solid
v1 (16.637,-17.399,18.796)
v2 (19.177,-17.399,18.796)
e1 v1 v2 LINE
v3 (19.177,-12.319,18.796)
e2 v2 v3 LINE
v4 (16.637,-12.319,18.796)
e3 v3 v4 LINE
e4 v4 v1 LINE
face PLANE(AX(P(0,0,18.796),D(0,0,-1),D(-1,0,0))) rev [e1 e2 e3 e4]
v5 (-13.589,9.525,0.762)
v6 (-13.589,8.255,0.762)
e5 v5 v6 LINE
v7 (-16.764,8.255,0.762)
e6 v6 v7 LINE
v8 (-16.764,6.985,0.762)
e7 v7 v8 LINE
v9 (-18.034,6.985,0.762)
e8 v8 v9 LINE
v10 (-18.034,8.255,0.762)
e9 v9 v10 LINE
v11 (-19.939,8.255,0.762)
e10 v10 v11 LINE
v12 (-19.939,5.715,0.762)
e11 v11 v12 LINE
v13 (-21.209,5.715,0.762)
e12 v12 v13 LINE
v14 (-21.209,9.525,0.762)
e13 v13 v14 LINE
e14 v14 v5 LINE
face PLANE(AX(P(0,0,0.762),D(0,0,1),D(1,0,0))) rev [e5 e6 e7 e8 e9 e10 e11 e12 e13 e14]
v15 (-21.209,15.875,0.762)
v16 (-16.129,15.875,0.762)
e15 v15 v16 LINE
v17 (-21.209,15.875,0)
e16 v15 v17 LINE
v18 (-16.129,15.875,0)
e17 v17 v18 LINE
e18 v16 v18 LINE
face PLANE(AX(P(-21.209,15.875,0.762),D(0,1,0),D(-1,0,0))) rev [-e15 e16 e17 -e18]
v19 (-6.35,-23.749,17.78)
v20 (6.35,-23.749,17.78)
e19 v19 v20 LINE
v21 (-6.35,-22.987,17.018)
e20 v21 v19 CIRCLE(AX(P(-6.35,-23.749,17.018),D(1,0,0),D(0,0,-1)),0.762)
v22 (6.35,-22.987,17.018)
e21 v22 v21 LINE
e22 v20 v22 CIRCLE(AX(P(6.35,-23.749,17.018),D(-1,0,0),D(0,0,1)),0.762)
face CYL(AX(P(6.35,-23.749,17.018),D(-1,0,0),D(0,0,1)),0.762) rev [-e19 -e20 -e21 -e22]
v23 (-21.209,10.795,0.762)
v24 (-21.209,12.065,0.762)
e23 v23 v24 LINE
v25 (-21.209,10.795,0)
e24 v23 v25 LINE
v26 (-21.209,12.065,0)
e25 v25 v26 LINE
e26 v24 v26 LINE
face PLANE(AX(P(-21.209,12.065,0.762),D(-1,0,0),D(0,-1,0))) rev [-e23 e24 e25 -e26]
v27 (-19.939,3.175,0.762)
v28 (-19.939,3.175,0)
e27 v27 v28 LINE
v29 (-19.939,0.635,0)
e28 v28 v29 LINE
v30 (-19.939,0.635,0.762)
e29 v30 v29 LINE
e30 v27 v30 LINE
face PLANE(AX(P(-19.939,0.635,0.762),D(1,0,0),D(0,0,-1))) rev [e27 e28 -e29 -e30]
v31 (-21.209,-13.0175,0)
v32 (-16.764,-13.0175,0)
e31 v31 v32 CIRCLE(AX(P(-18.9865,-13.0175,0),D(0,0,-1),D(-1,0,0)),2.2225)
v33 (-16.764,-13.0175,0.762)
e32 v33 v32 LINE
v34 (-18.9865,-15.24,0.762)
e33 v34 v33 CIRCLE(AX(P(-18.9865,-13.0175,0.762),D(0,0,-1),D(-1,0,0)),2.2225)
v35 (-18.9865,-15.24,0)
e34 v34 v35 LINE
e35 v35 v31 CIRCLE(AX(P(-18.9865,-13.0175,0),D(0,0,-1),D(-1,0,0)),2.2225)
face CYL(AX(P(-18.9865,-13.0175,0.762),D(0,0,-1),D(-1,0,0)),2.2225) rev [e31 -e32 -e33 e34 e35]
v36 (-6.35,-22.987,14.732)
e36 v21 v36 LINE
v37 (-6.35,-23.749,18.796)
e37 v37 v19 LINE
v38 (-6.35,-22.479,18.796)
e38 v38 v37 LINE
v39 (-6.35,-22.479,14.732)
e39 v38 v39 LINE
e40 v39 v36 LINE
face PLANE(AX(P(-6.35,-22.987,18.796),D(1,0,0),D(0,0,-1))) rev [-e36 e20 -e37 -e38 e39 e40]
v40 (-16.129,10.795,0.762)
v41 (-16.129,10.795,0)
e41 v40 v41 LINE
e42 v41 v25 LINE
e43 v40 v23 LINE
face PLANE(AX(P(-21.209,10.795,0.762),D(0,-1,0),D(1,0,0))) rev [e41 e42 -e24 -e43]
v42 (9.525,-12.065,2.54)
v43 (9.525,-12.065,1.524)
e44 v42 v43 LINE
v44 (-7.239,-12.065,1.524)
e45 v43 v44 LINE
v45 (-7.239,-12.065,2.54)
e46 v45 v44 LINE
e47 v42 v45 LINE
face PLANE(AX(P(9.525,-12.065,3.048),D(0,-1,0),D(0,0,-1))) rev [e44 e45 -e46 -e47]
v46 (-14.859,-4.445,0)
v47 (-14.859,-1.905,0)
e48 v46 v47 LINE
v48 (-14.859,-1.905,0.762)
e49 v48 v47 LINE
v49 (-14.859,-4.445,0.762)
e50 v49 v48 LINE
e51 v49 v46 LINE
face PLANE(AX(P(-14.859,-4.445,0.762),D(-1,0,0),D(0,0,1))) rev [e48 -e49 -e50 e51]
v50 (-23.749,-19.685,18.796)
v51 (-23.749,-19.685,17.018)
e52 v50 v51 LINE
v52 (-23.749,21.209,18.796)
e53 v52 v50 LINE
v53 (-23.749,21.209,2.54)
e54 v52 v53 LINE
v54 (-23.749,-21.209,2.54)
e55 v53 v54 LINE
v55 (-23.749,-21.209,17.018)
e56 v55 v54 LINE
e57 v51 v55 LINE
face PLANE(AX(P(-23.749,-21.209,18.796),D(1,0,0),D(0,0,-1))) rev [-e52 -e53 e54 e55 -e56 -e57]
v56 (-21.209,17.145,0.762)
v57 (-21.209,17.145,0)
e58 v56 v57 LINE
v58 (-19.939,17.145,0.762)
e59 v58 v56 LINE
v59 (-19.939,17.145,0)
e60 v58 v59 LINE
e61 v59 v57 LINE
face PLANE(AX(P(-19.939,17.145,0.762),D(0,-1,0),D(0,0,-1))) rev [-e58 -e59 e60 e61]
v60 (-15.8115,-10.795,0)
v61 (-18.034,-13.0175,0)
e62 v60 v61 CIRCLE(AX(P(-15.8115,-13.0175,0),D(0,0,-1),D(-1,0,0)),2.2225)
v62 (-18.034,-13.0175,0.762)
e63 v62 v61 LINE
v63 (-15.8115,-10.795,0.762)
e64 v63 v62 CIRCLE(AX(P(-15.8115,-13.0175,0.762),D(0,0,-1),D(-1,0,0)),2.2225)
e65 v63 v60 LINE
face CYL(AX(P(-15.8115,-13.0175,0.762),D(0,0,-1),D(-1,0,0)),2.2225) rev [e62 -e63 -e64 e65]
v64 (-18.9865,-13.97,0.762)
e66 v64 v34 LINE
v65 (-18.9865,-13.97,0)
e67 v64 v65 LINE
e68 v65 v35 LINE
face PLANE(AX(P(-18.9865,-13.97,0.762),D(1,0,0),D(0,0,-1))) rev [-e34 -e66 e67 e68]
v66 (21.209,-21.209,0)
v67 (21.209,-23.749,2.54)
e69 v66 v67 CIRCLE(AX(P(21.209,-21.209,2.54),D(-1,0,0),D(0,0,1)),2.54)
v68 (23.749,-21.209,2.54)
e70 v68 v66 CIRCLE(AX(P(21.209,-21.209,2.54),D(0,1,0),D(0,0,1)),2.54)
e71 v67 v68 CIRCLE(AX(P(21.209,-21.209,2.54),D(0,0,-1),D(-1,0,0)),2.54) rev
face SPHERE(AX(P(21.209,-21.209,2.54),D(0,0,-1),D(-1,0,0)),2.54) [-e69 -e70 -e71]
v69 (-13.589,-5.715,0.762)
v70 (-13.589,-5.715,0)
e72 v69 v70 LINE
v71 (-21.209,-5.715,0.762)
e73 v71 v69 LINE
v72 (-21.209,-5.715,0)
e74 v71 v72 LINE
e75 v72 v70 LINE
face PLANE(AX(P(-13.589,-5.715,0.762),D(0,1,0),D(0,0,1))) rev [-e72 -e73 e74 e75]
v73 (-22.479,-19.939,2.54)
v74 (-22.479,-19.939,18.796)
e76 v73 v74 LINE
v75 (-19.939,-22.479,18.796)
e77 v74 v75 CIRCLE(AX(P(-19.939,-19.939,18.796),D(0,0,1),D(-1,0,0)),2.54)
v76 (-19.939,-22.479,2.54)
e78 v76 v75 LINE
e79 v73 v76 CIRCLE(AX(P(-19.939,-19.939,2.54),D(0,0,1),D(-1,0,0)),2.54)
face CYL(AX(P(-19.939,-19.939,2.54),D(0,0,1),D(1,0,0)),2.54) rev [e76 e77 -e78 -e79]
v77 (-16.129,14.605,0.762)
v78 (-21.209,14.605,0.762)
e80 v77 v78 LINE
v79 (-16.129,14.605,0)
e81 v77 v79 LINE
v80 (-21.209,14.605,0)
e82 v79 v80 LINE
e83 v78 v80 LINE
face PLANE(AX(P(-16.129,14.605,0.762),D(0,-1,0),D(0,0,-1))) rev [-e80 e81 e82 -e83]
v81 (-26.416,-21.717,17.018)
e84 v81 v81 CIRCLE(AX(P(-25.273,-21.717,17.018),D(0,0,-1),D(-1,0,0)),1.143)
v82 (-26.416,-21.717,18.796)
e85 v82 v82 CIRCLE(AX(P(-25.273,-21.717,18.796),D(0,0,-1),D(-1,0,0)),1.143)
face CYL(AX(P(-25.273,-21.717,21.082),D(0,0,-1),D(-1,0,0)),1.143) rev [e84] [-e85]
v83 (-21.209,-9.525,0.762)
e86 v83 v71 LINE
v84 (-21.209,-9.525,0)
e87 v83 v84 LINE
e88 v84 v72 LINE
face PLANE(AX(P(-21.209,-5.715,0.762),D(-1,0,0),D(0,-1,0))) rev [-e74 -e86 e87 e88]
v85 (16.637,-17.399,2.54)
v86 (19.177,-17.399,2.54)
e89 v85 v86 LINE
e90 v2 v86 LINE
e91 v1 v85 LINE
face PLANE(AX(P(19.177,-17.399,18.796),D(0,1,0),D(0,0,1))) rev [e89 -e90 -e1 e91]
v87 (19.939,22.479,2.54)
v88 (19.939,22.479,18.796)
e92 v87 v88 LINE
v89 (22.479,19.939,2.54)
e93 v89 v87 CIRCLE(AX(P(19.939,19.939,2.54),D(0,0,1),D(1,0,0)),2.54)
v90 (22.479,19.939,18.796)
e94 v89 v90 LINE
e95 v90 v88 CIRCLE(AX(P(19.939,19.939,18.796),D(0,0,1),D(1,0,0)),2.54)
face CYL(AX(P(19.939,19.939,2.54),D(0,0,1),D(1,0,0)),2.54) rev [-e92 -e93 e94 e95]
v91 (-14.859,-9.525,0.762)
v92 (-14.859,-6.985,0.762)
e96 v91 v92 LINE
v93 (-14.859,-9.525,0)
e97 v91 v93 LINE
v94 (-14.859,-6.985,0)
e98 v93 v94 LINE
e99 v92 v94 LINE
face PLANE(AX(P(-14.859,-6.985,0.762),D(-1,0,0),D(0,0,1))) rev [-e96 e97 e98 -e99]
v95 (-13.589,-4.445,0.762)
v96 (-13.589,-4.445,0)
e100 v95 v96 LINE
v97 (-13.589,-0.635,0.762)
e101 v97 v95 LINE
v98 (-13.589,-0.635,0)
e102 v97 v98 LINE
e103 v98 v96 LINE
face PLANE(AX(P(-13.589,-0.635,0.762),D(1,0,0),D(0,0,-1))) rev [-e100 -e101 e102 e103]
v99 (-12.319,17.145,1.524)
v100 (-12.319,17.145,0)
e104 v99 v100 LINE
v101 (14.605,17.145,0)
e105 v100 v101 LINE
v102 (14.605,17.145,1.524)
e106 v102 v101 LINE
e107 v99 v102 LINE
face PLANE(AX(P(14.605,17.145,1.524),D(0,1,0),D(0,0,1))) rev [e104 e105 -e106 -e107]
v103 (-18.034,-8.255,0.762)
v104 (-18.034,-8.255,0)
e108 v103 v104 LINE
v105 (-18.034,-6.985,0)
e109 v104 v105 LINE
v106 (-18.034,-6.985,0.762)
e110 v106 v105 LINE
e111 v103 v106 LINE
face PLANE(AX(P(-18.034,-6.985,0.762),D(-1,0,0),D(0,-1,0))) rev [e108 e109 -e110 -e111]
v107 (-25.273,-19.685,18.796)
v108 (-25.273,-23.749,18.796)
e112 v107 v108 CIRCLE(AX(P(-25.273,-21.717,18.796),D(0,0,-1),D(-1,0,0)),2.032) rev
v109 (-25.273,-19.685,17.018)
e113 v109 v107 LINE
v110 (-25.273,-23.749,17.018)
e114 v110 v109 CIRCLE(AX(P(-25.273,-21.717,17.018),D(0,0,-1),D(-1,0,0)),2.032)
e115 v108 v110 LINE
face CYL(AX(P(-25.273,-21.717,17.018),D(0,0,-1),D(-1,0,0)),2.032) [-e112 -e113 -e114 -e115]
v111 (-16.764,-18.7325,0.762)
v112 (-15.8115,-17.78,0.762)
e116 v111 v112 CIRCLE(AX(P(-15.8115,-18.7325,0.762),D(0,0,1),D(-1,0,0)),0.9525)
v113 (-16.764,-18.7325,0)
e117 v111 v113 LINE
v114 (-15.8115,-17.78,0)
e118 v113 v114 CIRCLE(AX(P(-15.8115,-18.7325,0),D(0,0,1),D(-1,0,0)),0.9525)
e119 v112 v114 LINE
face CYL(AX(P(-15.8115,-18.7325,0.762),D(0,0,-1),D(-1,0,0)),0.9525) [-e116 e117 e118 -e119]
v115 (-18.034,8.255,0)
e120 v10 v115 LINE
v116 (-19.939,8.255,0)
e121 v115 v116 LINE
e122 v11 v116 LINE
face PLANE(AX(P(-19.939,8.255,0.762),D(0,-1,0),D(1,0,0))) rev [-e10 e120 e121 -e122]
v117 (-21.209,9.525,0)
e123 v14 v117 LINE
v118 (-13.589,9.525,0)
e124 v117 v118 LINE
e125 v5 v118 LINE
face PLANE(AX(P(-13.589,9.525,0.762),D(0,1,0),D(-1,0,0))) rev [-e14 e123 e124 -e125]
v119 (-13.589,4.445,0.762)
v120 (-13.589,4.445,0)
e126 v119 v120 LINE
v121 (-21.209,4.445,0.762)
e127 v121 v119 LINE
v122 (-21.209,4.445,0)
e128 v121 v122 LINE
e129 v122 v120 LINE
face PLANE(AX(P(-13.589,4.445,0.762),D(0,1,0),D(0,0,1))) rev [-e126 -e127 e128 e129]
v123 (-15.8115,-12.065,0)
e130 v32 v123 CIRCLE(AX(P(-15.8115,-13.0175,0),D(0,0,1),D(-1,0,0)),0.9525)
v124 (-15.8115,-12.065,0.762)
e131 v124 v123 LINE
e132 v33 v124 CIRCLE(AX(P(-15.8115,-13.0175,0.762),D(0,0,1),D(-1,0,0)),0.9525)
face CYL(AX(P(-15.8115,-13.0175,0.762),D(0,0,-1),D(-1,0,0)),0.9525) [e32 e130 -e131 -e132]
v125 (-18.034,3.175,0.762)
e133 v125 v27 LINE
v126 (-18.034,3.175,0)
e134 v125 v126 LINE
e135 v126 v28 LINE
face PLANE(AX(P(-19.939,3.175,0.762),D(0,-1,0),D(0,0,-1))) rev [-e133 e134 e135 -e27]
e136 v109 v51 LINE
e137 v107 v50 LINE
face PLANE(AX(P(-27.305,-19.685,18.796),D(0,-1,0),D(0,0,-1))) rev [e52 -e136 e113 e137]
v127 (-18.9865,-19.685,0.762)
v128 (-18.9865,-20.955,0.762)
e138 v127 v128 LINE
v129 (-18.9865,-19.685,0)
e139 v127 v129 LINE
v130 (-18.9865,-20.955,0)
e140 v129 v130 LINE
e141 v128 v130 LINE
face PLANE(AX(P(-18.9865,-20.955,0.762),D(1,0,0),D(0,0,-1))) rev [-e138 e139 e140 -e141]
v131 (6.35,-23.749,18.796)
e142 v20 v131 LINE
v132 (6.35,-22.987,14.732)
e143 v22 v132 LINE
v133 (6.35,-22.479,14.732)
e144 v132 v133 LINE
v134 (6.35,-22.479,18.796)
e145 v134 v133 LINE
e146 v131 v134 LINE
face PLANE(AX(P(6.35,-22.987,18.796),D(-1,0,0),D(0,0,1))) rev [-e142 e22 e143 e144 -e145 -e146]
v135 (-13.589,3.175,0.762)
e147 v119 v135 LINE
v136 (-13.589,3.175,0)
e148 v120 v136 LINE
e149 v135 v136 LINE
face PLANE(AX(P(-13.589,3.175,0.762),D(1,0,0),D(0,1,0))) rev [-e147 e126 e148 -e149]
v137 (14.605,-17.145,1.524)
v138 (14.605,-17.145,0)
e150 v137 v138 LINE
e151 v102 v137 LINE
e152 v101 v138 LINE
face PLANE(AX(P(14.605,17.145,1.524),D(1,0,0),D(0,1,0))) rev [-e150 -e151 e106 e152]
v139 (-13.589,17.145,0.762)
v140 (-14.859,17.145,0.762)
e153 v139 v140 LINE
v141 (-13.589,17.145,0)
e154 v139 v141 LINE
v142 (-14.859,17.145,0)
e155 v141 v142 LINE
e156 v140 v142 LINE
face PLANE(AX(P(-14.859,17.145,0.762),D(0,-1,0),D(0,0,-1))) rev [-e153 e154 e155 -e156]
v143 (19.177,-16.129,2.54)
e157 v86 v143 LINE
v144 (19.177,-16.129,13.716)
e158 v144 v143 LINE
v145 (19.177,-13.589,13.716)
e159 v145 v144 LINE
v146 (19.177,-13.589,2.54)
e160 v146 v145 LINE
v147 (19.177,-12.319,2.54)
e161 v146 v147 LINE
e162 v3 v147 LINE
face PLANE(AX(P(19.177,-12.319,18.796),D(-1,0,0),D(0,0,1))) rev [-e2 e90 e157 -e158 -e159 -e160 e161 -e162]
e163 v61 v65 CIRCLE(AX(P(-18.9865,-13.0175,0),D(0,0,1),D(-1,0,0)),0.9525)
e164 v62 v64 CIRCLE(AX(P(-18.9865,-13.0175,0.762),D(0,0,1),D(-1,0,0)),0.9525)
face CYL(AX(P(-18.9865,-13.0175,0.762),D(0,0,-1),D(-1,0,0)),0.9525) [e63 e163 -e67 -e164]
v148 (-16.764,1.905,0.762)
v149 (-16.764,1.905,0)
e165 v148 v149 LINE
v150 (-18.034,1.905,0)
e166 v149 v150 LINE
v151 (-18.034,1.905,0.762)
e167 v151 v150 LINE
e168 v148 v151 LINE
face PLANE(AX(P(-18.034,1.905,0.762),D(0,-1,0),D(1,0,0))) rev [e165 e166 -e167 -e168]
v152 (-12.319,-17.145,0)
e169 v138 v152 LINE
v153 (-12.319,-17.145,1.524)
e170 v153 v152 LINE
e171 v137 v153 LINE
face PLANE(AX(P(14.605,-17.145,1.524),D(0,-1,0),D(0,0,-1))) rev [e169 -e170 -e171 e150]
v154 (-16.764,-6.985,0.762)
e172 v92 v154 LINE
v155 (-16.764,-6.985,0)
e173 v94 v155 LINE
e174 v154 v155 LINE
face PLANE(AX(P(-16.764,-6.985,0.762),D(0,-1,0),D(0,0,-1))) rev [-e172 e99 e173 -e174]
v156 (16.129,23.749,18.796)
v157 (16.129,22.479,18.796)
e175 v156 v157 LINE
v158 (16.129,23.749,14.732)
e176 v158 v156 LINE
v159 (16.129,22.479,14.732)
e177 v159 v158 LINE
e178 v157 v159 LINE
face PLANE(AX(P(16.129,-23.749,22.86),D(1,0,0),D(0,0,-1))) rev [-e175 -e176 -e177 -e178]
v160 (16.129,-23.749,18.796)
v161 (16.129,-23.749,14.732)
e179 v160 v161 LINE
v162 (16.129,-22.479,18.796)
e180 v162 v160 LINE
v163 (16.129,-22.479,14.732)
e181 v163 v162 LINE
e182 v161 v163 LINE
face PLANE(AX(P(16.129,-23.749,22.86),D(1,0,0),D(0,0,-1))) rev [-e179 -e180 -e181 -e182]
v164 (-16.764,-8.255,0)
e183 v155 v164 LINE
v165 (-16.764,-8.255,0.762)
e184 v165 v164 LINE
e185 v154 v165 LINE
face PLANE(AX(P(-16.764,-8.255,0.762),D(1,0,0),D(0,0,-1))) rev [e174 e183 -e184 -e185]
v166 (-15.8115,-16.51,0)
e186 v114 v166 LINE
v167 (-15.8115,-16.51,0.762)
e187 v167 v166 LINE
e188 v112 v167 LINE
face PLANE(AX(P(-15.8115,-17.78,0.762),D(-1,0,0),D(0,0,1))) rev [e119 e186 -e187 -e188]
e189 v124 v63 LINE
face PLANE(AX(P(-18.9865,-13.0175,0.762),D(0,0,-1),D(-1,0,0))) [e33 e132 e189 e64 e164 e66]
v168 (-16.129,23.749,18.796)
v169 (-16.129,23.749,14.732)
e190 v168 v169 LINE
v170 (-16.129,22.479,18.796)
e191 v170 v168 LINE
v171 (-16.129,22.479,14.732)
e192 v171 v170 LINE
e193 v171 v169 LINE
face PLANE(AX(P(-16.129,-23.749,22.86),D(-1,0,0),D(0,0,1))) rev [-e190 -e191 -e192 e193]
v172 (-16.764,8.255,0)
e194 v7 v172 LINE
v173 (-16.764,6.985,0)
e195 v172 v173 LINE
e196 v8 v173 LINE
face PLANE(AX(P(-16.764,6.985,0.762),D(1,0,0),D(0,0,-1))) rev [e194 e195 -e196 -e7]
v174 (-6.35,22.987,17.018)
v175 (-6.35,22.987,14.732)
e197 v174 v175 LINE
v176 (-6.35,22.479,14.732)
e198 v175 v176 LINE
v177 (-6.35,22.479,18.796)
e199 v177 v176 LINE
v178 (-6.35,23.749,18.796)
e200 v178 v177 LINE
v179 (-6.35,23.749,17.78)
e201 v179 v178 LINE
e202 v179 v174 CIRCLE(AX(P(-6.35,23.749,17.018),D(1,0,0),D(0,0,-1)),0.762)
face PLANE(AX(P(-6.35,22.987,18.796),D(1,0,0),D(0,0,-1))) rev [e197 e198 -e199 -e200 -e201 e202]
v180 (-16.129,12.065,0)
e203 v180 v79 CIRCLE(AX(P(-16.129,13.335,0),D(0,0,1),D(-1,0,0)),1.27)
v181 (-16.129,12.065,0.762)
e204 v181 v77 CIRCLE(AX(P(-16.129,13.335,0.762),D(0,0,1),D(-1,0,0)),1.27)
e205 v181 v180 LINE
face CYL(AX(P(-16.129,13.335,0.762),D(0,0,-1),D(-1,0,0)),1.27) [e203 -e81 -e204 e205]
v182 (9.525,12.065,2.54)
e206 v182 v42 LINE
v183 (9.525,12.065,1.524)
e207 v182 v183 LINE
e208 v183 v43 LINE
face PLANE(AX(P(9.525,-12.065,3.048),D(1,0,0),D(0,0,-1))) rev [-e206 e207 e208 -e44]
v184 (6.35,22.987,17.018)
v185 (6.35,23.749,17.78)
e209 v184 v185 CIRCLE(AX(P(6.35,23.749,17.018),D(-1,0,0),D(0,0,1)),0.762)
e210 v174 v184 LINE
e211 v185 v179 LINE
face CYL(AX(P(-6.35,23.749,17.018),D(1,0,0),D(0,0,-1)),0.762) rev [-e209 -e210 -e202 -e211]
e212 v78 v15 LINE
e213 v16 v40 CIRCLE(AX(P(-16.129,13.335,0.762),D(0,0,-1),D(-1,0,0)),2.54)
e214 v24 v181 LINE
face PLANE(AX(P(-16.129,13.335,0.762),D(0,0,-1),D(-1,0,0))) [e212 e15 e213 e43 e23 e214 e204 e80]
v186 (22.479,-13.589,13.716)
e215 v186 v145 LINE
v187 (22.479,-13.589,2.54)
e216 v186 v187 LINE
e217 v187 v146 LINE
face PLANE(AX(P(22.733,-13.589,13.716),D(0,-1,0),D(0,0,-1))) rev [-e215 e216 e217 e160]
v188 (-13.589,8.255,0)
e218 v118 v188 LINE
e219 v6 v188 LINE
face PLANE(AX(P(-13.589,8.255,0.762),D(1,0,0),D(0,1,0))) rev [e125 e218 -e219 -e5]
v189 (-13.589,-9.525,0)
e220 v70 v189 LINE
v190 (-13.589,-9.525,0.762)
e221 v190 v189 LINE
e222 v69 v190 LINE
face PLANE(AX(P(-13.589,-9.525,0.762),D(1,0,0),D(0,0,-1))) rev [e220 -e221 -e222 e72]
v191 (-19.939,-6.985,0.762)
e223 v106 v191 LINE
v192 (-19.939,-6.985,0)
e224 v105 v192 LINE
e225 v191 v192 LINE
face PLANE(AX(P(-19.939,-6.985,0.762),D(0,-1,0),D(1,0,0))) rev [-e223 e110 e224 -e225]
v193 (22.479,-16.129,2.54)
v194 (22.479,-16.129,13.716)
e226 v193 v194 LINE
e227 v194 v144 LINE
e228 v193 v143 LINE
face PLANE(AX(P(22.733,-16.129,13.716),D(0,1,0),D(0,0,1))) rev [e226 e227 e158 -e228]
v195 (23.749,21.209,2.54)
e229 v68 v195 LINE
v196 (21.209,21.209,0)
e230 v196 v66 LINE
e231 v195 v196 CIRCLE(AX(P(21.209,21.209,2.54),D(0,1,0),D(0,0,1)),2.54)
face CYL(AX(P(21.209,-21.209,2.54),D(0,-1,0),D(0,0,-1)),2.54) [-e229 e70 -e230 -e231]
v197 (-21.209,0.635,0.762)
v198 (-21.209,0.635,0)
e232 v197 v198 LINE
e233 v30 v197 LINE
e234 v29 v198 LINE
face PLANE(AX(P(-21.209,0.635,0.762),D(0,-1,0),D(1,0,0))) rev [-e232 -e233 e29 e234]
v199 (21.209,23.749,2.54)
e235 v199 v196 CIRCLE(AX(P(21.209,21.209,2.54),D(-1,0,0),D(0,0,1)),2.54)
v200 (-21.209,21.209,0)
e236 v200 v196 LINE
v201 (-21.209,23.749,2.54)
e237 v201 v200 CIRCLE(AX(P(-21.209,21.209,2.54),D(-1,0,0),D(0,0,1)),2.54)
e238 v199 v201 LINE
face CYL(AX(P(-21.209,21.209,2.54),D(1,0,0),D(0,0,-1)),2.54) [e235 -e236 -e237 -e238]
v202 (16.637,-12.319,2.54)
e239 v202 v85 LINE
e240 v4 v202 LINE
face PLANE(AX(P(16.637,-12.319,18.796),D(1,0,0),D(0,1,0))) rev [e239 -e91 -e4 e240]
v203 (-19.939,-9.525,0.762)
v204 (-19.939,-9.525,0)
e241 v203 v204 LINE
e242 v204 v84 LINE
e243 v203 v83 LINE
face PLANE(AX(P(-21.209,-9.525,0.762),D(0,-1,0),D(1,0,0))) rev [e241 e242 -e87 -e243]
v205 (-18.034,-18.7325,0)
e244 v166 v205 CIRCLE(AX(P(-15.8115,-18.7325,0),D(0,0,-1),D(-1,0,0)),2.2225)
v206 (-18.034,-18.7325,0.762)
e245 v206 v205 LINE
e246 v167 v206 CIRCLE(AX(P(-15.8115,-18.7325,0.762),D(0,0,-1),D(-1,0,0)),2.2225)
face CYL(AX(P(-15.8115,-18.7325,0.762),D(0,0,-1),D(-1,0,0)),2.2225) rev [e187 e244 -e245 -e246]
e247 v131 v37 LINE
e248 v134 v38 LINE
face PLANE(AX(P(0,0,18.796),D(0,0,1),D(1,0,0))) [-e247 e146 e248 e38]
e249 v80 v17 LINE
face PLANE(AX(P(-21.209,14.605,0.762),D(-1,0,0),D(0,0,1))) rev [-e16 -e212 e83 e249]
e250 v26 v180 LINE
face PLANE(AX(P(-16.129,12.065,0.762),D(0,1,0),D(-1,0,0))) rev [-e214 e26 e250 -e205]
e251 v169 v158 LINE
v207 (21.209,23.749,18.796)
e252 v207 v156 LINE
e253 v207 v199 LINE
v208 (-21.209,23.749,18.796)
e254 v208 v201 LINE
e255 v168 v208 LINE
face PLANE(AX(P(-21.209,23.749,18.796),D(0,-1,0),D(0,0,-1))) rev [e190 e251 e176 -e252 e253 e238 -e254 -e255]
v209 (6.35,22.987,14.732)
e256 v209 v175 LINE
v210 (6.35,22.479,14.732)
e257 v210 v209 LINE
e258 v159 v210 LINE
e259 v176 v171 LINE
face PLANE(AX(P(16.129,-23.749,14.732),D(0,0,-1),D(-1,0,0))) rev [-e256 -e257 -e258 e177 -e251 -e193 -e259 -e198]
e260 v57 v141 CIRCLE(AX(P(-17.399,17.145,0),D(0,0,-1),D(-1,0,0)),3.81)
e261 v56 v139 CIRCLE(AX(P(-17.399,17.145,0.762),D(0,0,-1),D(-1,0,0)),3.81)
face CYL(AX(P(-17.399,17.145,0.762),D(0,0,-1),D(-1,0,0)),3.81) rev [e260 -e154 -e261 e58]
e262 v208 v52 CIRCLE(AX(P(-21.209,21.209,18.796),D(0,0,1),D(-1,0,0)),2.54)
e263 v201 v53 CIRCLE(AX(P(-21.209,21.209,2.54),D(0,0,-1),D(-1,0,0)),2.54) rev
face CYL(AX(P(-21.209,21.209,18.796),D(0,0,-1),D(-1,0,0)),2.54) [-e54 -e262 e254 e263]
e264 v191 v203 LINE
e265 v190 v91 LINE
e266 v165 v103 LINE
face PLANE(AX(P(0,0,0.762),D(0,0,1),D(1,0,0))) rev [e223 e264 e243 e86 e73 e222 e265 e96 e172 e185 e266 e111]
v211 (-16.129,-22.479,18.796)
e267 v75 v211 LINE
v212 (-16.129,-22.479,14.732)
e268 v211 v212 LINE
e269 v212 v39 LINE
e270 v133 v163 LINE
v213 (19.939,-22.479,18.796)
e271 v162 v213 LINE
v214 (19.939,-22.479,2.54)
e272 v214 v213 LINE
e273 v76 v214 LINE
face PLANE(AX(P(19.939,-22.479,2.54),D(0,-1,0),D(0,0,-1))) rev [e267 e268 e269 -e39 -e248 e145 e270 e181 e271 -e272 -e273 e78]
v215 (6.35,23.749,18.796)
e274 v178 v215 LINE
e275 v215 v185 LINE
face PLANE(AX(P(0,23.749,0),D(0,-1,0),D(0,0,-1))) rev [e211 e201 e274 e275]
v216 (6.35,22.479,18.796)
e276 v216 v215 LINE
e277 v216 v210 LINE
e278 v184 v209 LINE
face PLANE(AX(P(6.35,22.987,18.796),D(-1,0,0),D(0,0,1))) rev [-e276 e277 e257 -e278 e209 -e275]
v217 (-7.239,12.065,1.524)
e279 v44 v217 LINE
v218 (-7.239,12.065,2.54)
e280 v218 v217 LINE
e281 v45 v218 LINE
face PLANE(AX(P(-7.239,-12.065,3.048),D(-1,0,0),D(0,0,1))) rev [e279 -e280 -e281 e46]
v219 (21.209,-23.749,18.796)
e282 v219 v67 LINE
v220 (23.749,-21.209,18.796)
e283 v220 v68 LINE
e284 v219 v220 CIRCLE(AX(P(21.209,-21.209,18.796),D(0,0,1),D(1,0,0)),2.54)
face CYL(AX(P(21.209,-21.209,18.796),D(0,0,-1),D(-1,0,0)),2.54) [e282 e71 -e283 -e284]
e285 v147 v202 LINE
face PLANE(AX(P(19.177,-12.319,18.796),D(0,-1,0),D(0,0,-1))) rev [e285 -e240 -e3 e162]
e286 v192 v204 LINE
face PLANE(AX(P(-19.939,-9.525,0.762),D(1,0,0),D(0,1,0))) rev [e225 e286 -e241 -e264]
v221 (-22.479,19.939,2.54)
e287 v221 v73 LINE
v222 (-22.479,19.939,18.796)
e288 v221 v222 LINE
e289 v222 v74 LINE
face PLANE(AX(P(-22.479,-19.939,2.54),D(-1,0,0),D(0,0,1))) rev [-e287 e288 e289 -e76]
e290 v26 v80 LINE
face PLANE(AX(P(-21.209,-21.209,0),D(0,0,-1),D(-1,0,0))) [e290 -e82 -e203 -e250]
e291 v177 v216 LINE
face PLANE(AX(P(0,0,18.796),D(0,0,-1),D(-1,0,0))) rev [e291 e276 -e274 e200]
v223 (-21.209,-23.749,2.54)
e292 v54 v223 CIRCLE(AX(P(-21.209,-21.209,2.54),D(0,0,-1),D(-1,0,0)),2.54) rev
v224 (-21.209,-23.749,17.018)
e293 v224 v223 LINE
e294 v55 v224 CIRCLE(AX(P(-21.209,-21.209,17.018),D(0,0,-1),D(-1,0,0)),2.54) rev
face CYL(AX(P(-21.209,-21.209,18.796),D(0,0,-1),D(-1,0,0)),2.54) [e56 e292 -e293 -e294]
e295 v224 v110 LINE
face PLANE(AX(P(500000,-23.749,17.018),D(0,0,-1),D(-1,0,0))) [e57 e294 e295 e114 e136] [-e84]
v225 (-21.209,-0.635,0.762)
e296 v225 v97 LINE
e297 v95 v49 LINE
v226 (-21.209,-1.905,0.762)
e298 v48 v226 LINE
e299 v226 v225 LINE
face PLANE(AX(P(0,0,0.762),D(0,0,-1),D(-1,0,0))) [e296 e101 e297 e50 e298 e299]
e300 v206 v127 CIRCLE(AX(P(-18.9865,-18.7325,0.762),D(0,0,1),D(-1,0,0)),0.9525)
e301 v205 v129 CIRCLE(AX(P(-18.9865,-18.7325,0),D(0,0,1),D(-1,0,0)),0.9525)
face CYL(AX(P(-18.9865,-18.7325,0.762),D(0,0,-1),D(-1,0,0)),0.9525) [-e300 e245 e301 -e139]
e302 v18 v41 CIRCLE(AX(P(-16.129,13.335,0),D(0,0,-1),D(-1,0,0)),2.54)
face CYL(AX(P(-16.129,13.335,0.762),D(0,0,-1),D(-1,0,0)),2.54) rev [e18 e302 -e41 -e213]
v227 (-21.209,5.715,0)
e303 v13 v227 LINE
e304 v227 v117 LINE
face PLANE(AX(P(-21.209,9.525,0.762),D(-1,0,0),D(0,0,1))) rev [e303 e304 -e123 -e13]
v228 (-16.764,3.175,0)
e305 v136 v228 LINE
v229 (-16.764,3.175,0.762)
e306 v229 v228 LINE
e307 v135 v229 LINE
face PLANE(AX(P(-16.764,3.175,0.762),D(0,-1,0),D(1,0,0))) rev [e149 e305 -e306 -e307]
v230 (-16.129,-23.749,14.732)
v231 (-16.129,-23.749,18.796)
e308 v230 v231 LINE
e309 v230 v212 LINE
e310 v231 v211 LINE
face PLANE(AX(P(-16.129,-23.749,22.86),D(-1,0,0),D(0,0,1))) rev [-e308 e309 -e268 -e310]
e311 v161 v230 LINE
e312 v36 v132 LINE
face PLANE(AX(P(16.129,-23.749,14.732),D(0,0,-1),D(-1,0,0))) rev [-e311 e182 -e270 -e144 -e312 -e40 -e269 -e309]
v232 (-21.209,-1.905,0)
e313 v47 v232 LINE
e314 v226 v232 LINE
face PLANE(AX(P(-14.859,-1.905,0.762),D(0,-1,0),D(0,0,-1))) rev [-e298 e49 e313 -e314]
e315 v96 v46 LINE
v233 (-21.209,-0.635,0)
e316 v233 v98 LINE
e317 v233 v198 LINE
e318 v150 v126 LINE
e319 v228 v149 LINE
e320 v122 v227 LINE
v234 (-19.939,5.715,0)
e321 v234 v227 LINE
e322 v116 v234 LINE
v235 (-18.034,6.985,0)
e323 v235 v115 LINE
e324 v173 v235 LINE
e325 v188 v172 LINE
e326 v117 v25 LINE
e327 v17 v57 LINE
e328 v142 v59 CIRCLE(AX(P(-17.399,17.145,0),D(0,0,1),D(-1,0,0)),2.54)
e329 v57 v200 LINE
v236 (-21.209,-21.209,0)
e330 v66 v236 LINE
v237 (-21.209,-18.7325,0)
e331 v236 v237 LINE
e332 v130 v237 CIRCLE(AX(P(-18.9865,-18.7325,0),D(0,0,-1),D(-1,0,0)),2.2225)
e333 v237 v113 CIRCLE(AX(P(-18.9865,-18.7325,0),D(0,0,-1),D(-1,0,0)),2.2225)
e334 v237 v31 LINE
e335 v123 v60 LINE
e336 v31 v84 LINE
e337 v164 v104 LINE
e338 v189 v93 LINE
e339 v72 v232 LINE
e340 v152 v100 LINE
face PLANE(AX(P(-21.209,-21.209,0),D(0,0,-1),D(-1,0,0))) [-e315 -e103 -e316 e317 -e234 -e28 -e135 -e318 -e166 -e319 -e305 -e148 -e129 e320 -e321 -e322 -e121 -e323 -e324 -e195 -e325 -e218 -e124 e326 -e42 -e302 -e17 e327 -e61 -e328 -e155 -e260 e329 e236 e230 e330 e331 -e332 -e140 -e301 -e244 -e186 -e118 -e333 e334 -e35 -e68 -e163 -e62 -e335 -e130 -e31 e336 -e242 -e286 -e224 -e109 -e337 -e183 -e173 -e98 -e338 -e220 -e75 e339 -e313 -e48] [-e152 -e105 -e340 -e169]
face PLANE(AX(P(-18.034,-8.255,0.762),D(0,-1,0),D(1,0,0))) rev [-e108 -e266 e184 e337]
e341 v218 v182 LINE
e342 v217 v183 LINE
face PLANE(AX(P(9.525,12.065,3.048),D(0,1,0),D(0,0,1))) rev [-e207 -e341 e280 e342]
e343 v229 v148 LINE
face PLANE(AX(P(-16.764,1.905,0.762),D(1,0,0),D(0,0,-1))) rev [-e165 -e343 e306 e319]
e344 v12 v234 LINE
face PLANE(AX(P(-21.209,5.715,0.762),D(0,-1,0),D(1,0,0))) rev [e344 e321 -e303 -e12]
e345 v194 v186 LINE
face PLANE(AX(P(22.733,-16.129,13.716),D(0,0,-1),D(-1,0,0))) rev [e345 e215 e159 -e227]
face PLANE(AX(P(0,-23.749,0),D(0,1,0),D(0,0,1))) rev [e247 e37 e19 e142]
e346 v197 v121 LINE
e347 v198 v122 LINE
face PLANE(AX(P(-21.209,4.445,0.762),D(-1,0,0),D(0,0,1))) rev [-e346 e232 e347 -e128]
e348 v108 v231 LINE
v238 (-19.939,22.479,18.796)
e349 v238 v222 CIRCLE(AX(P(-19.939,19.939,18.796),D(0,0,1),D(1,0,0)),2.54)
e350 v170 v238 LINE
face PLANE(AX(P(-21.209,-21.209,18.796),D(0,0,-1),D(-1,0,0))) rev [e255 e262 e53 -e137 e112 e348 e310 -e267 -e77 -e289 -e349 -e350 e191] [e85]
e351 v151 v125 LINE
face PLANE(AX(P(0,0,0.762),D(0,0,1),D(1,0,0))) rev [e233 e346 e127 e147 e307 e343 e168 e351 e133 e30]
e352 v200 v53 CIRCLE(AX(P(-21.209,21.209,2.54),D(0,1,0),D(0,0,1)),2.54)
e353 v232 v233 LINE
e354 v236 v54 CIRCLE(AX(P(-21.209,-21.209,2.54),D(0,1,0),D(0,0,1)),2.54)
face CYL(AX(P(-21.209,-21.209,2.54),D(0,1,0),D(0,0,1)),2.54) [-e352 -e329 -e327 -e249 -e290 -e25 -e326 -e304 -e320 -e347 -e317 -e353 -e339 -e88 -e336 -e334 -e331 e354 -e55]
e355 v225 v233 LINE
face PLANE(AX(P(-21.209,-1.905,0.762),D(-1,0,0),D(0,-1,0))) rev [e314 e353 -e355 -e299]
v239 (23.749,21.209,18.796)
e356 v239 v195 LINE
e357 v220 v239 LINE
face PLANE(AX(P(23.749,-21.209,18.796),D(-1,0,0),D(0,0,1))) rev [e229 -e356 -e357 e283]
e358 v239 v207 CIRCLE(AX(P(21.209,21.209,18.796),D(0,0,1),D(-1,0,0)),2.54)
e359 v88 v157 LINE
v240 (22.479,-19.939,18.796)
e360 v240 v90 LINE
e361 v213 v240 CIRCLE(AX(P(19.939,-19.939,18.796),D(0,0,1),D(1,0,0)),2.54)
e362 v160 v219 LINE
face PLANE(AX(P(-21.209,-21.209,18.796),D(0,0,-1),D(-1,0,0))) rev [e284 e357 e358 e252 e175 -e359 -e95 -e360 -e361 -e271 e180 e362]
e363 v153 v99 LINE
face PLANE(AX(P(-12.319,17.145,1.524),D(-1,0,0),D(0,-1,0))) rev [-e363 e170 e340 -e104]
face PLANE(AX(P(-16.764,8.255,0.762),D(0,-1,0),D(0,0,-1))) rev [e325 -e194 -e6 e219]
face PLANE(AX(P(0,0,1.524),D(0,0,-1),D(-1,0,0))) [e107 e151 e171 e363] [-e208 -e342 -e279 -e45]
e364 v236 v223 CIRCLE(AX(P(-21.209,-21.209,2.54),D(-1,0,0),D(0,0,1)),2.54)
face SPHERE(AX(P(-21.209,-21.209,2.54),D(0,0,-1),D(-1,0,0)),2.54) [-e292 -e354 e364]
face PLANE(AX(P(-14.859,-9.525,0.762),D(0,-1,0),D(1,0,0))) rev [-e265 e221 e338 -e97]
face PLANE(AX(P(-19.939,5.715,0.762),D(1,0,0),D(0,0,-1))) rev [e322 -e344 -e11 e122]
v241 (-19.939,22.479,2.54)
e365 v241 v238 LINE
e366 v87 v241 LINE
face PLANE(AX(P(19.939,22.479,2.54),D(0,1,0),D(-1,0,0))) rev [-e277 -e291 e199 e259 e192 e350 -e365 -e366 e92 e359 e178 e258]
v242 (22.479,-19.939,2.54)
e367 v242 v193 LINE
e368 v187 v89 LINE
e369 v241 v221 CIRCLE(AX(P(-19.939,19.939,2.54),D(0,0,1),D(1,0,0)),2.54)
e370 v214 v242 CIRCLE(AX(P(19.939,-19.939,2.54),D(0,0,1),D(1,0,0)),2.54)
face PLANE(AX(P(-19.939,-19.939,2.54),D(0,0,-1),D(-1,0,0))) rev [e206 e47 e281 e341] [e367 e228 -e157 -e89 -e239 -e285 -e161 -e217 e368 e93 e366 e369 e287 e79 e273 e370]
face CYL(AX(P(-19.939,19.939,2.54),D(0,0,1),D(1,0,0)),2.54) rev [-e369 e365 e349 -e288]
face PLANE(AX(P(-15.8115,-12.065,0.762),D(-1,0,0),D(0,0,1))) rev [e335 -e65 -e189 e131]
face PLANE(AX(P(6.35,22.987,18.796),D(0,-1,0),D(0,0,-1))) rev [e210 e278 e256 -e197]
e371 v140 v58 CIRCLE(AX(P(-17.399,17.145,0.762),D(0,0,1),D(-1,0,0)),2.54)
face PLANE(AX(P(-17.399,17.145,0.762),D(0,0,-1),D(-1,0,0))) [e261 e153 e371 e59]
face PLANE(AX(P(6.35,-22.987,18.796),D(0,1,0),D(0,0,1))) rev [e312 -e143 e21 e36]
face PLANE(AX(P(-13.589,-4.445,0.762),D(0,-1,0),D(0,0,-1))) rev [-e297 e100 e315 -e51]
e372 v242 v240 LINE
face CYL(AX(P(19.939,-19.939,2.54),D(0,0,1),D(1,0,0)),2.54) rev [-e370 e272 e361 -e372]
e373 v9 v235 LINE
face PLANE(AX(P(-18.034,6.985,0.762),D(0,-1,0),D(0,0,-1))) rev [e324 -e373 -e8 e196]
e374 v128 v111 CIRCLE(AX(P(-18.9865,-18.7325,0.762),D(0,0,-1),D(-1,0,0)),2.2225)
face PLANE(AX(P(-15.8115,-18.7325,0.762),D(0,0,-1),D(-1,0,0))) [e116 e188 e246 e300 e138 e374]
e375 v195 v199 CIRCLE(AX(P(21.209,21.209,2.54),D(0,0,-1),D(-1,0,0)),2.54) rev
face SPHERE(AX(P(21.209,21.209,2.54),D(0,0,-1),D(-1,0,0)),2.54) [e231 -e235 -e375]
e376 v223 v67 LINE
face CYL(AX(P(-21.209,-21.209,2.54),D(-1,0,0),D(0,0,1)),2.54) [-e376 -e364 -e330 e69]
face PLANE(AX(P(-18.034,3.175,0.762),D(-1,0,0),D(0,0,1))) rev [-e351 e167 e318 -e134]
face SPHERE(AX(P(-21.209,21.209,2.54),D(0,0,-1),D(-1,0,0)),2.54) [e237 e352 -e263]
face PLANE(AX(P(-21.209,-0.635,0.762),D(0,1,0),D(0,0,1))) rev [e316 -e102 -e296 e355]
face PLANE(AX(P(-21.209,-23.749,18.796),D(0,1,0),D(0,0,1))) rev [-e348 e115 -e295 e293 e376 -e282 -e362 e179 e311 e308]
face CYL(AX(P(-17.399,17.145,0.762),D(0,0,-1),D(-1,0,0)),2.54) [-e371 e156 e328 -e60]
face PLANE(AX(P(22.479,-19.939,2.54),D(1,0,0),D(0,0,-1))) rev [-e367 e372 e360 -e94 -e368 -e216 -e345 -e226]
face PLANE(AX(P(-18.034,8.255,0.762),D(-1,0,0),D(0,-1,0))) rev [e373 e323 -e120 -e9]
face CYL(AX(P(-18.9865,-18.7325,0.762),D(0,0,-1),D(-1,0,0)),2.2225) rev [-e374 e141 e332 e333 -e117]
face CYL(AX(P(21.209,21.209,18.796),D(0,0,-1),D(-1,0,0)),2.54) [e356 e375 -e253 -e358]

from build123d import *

# Parameters (mm, degrees)
BOSS_EXTRUDE1_DEPTH             = 18.796
CUT_EXTRUDE1_DEPTH              = 16.256
FILLET1_R                       = 2.54
CUT_EXTRUDE2_DEPTH              = 57.332624837
CUT_EXTRUDE2_DEPTH_BACK         = 57.332624837
SKETCH3_W                       = 32.258
SKETCH3_H                       = 8.128
SKETCH5_W                       = 26.924
SKETCH5_H                       = 34.29
CUT_EXTRUDE4_DEPTH              = 1.524
SKETCH6_W                       = 16.764
SKETCH6_H                       = 24.13
CUT_EXTRUDE5_DEPTH              = 1.524
SKETCH8_W                       = 12.7
SKETCH8_H                       = 0.508
BOSS_EXTRUDE3_DEPTH             = 4.064
SKETCH9_W                       = 12.7
SKETCH9_H                       = 1.016
BOSS_EXTRUDE4_DEPTH             = 0.762
FILLET2_R                       = 0.762
SKETCH10_W                      = 12.7
SKETCH10_H                      = 1.016
BOSS_EXTRUDE5_DEPTH             = 0.762
FILLET3_R                       = 0.762
SKETCH11_W                      = 1.778
SKETCH11_H                      = 4.064
BOSS_EXTRUDE6_DEPTH             = 3.556
BOSS_EXTRUDE6_DIRECTION_2_REACH = 58.333
FILLET4_RADIUS                  = 2.032
FILLET4_LENGTH                  = 1.778
SKETCH12_R                      = 1.143
CUT_EXTRUDE7_DEPTH              = 4.064
CUT_EXTRUDE8_DEPTH              = 0.762
SKETCH13_W                      = 2.54
SKETCH13_H                      = 5.08
BOSS_EXTRUDE7_DEPTH             = 16.256
SKETCH15_W                      = 11.176
SKETCH15_H                      = 2.54
BOSS_EXTRUDE8_DEPTH             = 3.556


with BuildPart() as part:
    # Sketch1 → Boss-Extrude1 (new body)
    with BuildSketch(Plane.XY):
        with BuildLine():
            Line((-21.209, -23.749), (21.209, -23.749))
            ThreePointArc((21.209, -23.749), (23.005051224, -23.005051224), (23.749, -21.209))
            Line((23.749, -21.209), (23.749, 21.209))
            ThreePointArc((23.749, 21.209), (23.005051224, 23.005051224), (21.209, 23.749))
            Line((21.209, 23.749), (-21.209, 23.749))
            ThreePointArc((-21.209, 23.749), (-23.005051224, 23.005051224), (-23.749, 21.209))
            Line((-23.749, 21.209), (-23.749, -21.209))
            ThreePointArc((-23.749, -21.209), (-23.005051224, -23.005051224), (-21.209, -23.749))
        make_face()
    extrude(amount=BOSS_EXTRUDE1_DEPTH)

    # Sketch2 → Cut-Extrude1 (cut)
    with BuildSketch(Plane.XY.offset(18.796)):
        with BuildLine():
            Line((19.939, -22.479), (-19.939, -22.479))
            ThreePointArc((-19.939, -22.479), (-21.735051224, -21.735051224), (-22.479, -19.939))
            Line((-22.479, -19.939), (-22.479, 19.939))
            ThreePointArc((-22.479, 19.939), (-21.735051224, 21.735051224), (-19.939, 22.479))
            Line((-19.939, 22.479), (19.939, 22.479))
            ThreePointArc((19.939, 22.479), (21.735051224, 21.735051224), (22.479, 19.939))
            Line((22.479, 19.939), (22.479, -19.939))
            ThreePointArc((22.479, -19.939), (21.735051224, -21.735051224), (19.939, -22.479))
        make_face()
    extrude(amount=-CUT_EXTRUDE1_DEPTH, mode=Mode.SUBTRACT)

    # Fillet1
    fillet1_edges = [part.edges().sort_by_distance(p)[0] for p in [
        (0, -23.749, 0),
        (-23.005051224, -23.005051224, 0),
        (-23.749, 0, 0),
        (-23.005051224, 23.005051224, 0),
        (0, 23.749, 0),
        (23.005051224, 23.005051224, 0),
        (23.749, 0, 0),
        (23.005051224, -23.005051224, 0),
    ]]
    fillet(fillet1_edges, radius=FILLET1_R)

    # Sketch3 → Cut-Extrude2 (cut, two sides: drawn at the far end of the back side and taken through both)
    with BuildSketch(Plane(origin=(0, 23.749, 0), x_dir=(1, 0, 0), z_dir=(0, 1, 0)).offset(-CUT_EXTRUDE2_DEPTH_BACK)):
        with Locations((0, -18.796)):
            Rectangle(SKETCH3_W, SKETCH3_H)
    extrude(amount=CUT_EXTRUDE2_DEPTH + CUT_EXTRUDE2_DEPTH_BACK, mode=Mode.SUBTRACT)

    # Sketch5 → Cut-Extrude4 (cut)
    with BuildSketch(Plane(origin=(0, 0, 0), x_dir=(-1, 0, 0), z_dir=(0, 0, -1))):
        with Locations((-1.143, 0)):
            Rectangle(SKETCH5_W, SKETCH5_H)
    extrude(amount=-CUT_EXTRUDE4_DEPTH, mode=Mode.SUBTRACT)

    # Sketch6 → Cut-Extrude5 (cut)
    with BuildSketch(Plane(origin=(0, 0, 1.524), x_dir=(-1, 0, 0), z_dir=(0, 0, -1))):
        with Locations((-1.143, 0)):
            Rectangle(SKETCH6_W, SKETCH6_H)
    extrude(amount=-CUT_EXTRUDE5_DEPTH, mode=Mode.SUBTRACT)

    # Sketch8 → Boss-Extrude3 (add)
    with BuildSketch(Plane.XY.offset(14.732)):
        with Locations((0, 22.733)):
            Rectangle(SKETCH8_W, SKETCH8_H)
        with Locations((0, -22.733)):
            Rectangle(SKETCH8_W, SKETCH8_H)
    extrude(amount=BOSS_EXTRUDE3_DEPTH)

    # Sketch9 → Boss-Extrude4 (add)
    with BuildSketch(Plane(origin=(0, 22.987, 0), x_dir=(1, 0, 0), z_dir=(0, 1, 0))):
        with Locations((0, -18.288)):
            Rectangle(SKETCH9_W, SKETCH9_H)
    extrude(amount=BOSS_EXTRUDE4_DEPTH)

    # Fillet2
    fillet2_edges = [part.edges().sort_by_distance(p)[0] for p in [
        (0, 22.987, 17.78),
    ]]
    fillet(fillet2_edges, radius=FILLET2_R - 0.0001)  # a hair under: the kernel refuses the full size

    # Sketch10 → Boss-Extrude5 (add)
    with BuildSketch(Plane.XZ.offset(22.987)):
        with Locations((0, 18.288)):
            Rectangle(SKETCH10_W, SKETCH10_H)
    extrude(amount=BOSS_EXTRUDE5_DEPTH)

    # Fillet3
    fillet3_edges = [part.edges().sort_by_distance(p)[0] for p in [
        (0, -22.987, 17.78),
    ]]
    fillet(fillet3_edges, radius=FILLET3_R - 0.0001)  # a hair under: the kernel refuses the full size

    # Sketch11 → Boss-Extrude6 (add)
    with BuildSketch(Plane.ZY.offset(23.749)):
        with Locations((17.907, -21.717)):
            Rectangle(SKETCH11_W, SKETCH11_H)
    extrude(amount=BOSS_EXTRUDE6_DEPTH)

    # Sketch11 → Boss-Extrude6 direction 2 (add, up to next)
    with BuildSketch(Plane.ZY.offset(23.749), mode=Mode.PRIVATE) as boss_extrude6_direction_2_sk1:
        with Locations((17.907, -21.717)):
            Rectangle(SKETCH11_W, SKETCH11_H)
    boss_extrude6_direction_2_tool1 = extrude(boss_extrude6_direction_2_sk1.sketch, amount=-BOSS_EXTRUDE6_DIRECTION_2_REACH, mode=Mode.PRIVATE) - part.part
    add(boss_extrude6_direction_2_tool1.solids().sort_by_distance((-23.749, -21.717, 17.907))[0])

    # Fillet4: full round fillet: the end face becomes a half cylinder, R = half its width
    fillet4_face = Plane((-27.305, -21.717, 17.907), x_dir=(0, 0, -1), z_dir=(-1, 0, 0))  # on the end face: x along it, z out of the body
    fillet4_slab = fillet4_face.offset(-FILLET4_RADIUS / 2) * Box(FILLET4_LENGTH, 2 * FILLET4_RADIUS, FILLET4_RADIUS, mode=Mode.PRIVATE)  # the body's end, R deep
    fillet4_round = Plane((-25.273, -21.717, 17.907), x_dir=(-1, 0, 0), z_dir=(0, 0, -1)) * Cylinder(FILLET4_RADIUS, FILLET4_LENGTH, mode=Mode.PRIVATE)  # its axis R under the face
    add(fillet4_slab - fillet4_round, mode=Mode.SUBTRACT)

    # Sketch12 → Cut-Extrude7 (cut)
    with BuildSketch(Plane(origin=(0, 0, 17.018), x_dir=(-1, 0, 0), z_dir=(0, 0, -1))):
        with Locations((25.273, -21.717)):
            Circle(SKETCH12_R)
    extrude(amount=-CUT_EXTRUDE7_DEPTH, mode=Mode.SUBTRACT)

    # Sketch7 → Cut-Extrude8 (cut)
    with BuildSketch(Plane(origin=(0, 0, 0), x_dir=(-1, 0, 0), z_dir=(0, 0, -1))):
        with BuildLine():
            Line((19.939, 17.145), (21.209, 17.145))
            ThreePointArc((21.209, 17.145), (17.399, 20.955), (13.589, 17.145))
            Line((13.589, 17.145), (14.859, 17.145))
            ThreePointArc((14.859, 17.145), (17.399, 19.685), (19.939, 17.145))
        make_face()
        with BuildLine():
            Line((21.209, 15.875), (16.129, 15.875))
            ThreePointArc((16.129, 15.875), (13.589, 13.335), (16.129, 10.795))
            Line((16.129, 10.795), (21.209, 10.795))
            Line((21.209, 10.795), (21.209, 12.065))
            Line((21.209, 12.065), (16.129, 12.065))
            ThreePointArc((16.129, 12.065), (14.859, 13.335), (16.129, 14.605))
            Line((16.129, 14.605), (21.209, 14.605))
            Line((21.209, 14.605), (21.209, 15.875))
        make_face()
        Polygon((13.589, 9.525), (21.209, 9.525), (21.209, 5.715), (19.939, 5.715), (19.939, 8.255), (18.034, 8.255), (18.034, 6.985), (16.764, 6.985), (16.764, 8.255), (13.589, 8.255), align=None)
        Polygon((13.589, 4.445), (21.209, 4.445), (21.209, 0.635), (19.939, 0.635), (19.939, 3.175), (18.034, 3.175), (18.034, 1.905), (16.764, 1.905), (16.764, 3.175), (13.589, 3.175), align=None)
        Polygon((21.209, -0.635), (13.589, -0.635), (13.589, -4.445), (14.859, -4.445), (14.859, -1.905), (21.209, -1.905), align=None)
        Polygon((13.589, -5.715), (21.209, -5.715), (21.209, -9.525), (19.939, -9.525), (19.939, -6.985), (18.034, -6.985), (18.034, -8.255), (16.764, -8.255), (16.764, -6.985), (14.859, -6.985), (14.859, -9.525), (13.589, -9.525), align=None)
        with BuildLine():
            Line((18.9865, -13.97), (18.9865, -15.24))
            ThreePointArc((18.9865, -15.24), (20.558044821, -11.445955179), (16.764, -13.0175))
            ThreePointArc((16.764, -13.0175), (15.137980791, -13.691019209), (15.8115, -12.065))
            Line((15.8115, -12.065), (15.8115, -10.795))
            ThreePointArc((15.8115, -10.795), (14.239955179, -14.589044821), (18.034, -13.0175))
            ThreePointArc((18.034, -13.0175), (19.660019209, -12.343980791), (18.9865, -13.97))
        make_face()
        with BuildLine():
            Line((15.8115, -17.78), (15.8115, -16.51))
            ThreePointArc((15.8115, -16.51), (14.239955179, -20.304044821), (18.034, -18.7325))
            ThreePointArc((18.034, -18.7325), (19.660019209, -18.058980791), (18.9865, -19.685))
            Line((18.9865, -19.685), (18.9865, -20.955))
            ThreePointArc((18.9865, -20.955), (20.558044821, -17.160955179), (16.764, -18.7325))
            ThreePointArc((16.764, -18.7325), (15.137980791, -19.406019209), (15.8115, -17.78))
        make_face()
    extrude(amount=-CUT_EXTRUDE8_DEPTH, mode=Mode.SUBTRACT)

    # Sketch13 → Boss-Extrude7 (add)
    with BuildSketch(Plane.XY.offset(2.54)):
        with Locations((17.907, -14.859)):
            Rectangle(SKETCH13_W, SKETCH13_H)
    extrude(amount=BOSS_EXTRUDE7_DEPTH)

    # Sketch15 → Boss-Extrude8 (add)
    with BuildSketch(Plane(origin=(19.177, 0, 0), x_dir=(0, 0, -1), z_dir=(1, 0, 0))):
        with Locations((-8.128, -14.859)):
            Rectangle(SKETCH15_W, SKETCH15_H)
    extrude(amount=BOSS_EXTRUDE8_DEPTH)


solid = part.part
